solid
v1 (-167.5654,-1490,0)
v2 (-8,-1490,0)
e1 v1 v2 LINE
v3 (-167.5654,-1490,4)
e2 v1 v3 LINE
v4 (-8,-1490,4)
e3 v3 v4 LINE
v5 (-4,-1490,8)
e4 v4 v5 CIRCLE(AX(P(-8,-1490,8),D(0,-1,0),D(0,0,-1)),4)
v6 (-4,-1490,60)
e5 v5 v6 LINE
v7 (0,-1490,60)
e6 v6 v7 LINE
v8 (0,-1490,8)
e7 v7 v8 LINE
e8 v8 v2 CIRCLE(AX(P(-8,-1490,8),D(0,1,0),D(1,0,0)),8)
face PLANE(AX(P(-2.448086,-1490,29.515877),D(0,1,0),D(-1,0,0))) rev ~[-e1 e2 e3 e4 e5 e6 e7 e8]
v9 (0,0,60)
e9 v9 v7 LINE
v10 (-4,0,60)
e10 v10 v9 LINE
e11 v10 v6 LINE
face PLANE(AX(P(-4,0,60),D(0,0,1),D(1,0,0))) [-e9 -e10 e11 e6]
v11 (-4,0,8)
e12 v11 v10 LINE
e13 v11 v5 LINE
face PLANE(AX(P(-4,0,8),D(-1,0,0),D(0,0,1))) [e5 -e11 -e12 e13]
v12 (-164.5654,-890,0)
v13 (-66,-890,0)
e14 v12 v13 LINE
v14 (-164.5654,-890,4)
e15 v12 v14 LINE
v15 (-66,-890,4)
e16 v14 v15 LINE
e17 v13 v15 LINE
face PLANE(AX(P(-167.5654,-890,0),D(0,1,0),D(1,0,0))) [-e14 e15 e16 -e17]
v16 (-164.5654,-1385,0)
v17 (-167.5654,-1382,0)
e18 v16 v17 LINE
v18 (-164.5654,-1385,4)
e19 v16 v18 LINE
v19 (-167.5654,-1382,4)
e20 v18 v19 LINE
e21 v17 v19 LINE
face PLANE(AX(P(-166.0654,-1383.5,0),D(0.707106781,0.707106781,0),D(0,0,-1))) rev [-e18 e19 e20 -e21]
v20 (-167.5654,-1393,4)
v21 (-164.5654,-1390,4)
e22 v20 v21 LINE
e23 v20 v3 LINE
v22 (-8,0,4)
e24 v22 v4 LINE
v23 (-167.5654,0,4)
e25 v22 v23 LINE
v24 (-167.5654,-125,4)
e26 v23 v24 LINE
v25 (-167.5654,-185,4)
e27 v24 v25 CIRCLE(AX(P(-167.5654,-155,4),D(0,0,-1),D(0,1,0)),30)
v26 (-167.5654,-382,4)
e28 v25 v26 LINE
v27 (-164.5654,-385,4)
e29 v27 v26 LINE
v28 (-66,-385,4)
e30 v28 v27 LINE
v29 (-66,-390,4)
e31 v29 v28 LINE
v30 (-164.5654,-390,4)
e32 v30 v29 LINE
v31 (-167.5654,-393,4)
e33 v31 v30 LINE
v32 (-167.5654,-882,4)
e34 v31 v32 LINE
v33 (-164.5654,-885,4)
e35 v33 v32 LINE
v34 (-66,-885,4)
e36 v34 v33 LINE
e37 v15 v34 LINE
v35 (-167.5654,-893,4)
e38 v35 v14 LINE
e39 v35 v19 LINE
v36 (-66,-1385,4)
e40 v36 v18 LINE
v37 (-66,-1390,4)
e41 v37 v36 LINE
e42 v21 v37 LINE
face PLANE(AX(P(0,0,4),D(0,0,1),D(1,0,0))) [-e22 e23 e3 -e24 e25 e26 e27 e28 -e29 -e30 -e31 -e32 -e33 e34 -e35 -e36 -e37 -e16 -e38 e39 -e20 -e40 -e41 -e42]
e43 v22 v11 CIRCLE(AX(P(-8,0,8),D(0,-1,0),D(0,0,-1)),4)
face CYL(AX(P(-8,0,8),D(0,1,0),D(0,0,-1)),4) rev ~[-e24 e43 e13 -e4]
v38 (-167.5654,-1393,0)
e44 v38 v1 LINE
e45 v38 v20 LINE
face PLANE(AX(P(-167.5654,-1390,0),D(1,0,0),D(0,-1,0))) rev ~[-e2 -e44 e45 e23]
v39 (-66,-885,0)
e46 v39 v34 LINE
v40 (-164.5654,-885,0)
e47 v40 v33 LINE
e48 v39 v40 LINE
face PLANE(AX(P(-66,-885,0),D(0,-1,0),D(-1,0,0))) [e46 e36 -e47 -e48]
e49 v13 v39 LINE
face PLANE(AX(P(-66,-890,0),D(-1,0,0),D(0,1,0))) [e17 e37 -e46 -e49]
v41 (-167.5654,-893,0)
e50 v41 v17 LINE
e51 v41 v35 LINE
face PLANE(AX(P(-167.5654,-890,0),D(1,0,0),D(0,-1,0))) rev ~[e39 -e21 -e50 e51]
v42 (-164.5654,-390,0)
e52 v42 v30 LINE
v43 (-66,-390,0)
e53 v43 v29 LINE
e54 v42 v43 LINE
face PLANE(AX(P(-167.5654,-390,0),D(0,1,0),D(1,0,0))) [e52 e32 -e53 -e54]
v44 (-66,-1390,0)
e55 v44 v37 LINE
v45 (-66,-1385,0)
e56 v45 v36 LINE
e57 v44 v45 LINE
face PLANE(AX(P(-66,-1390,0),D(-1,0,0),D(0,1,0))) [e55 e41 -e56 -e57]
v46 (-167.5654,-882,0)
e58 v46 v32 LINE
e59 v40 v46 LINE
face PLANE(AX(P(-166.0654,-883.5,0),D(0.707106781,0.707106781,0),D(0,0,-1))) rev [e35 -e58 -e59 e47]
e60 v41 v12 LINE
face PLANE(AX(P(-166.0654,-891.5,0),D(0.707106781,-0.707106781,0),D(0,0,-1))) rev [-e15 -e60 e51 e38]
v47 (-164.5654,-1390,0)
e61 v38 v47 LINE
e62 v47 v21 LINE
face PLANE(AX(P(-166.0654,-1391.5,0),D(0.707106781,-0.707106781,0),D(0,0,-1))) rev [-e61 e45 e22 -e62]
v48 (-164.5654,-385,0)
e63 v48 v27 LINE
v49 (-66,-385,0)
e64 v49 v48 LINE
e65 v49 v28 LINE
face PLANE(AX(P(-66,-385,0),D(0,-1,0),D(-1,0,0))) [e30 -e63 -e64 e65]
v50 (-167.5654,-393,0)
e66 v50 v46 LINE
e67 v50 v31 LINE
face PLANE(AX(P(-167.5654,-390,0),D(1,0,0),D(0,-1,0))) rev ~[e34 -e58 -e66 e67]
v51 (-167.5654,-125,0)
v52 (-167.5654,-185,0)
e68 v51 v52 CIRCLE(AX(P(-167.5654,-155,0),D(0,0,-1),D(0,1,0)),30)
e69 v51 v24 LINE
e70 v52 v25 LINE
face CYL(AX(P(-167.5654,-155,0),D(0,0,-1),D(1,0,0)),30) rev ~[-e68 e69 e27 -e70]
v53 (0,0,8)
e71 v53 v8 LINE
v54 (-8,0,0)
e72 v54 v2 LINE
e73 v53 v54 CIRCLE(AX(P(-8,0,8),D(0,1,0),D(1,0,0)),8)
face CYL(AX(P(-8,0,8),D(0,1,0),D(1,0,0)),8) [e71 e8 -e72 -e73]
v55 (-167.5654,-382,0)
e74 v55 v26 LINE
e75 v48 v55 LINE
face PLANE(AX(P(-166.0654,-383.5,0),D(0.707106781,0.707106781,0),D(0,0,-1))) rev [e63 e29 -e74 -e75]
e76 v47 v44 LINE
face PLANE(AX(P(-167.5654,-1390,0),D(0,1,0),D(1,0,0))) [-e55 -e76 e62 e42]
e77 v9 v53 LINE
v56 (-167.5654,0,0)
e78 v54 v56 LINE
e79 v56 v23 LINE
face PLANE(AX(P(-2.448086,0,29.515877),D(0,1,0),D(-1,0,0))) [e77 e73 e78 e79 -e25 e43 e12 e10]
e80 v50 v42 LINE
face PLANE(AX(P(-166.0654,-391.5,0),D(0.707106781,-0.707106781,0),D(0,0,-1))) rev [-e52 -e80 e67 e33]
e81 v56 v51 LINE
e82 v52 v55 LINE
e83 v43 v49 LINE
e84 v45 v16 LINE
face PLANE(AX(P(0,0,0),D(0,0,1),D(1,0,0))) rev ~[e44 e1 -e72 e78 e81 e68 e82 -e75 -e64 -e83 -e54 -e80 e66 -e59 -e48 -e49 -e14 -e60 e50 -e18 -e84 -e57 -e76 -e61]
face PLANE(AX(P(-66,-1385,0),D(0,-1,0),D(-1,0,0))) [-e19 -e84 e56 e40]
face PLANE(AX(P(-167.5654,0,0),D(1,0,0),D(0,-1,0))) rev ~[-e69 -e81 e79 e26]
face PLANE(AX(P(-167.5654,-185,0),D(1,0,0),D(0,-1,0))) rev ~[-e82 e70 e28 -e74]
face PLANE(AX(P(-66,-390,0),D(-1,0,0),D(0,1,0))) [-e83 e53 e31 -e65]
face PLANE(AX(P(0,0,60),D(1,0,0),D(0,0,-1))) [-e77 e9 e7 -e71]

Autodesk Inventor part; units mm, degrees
ref_plane "YZ Plane" through (0, 0, 0) normal (1, 0, 0) x (0, 1, 0)
ref_plane "XZ Plane" through (0, 0, 0) normal (0, 1, 0) x (-1, 0, 0)
ref_plane "XY Plane" through (0, 0, 0) normal (0, 0, 1) x (1, 0, 0)
sketch "Sketch1" plane through (0, 0, 0) normal (0, 0, 1) x (1, 0, 0)
  line L0 (0, 0) -> (-167.5654, 0)
  line L1 (-167.5654, 0) -> (-167.5654, -1490)
  line L2 (-167.5654, -1490) -> (0, -1490)
  line L3 (0, -1490) -> (0, 0)
  line L4 (-167.5654, -1390) -> (-66, -1390)
  line L5 (-66, -1390) -> (-66, -1385)
  line L6 (-66, -1385) -> (-167.5654, -1385)
  line L7 (-167.5654, -1385) -> (-167.5654, -1390)
  line L8 (-167.5654, -890) -> (-66, -890)
  line L9 (-66, -890) -> (-66, -885)
  line L10 (-66, -885) -> (-167.5654, -885)
  line L11 (-167.5654, -885) -> (-167.5654, -890)
  line L12 (-167.5654, -390) -> (-66, -390)
  line L13 (-66, -390) -> (-66, -385)
  line L14 (-66, -385) -> (-167.5654, -385)
  line L15 (-167.5654, -385) -> (-167.5654, -390)
  circle A0 centre (-167.5654, -155) radius 30
  point P0 (-167.5654, -385)
  point P1 (-167.5654, -390)
  point P2 (-167.5654, -885)
  point P3 (-167.5654, -890)
  point P4 (-167.5654, -125)
  point P5 (-167.5654, -185)
  dimension "d0" = 1490
  dimension "d1" = 167.5654
  dimension "d2" = 5
  dimension "d4" = 100
  dimension "d7" = 500
  dimension "d23" = 66
  dimension "d28" = 60
  dimension "d29" = 1335
extrude "Plate1" add sketch "Sketch1" along normal blind 4 contours L3 L2 L1 L4 L5 L6 L8 L9 L10 L12 L13 L14 A0 L0
sketch "Sketch2" plane through (-4, 0, 0) normal (1, 0, 0) x (0, 1, 0)
  line L0 (-1490, 0) -> (0, 0)
  line L1 (0, 0) -> (0, 60)
  line L2 (0, 60) -> (-1490, 60)
  line L3 (-1490, 60) -> (-1490, 0)
edge flange "Flange1" height 60 angle 90 thickness 4 bend radius 4 thickness toward (1, 0, 0) relief tear relief width 4 relief depth 2 edges at (0, -745, 4) wall of the first edge with corners at (-4, -1490, 0) (-4, 0, 0) (-4, 0, 60) (-4, -1490, 60)
bend "Bend1"
corner "Corner1"
chamfer "Corner Chamfer1" distance 3 angle 45 6 edges at (-167.5654, -1390, 2) (-167.5654, -1385, 2) (-167.5654, -890, 2) (-167.5654, -885, 2) (-167.5654, -385, 2) (-167.5654, -390, 2)
equation "\"d0\" = Стрингер_длина"
equation "\"d1\" = стрингер_глубина_3"
equation "\"d2\" = паз_под_стрингер_толщина"
equation "\"d23\" = паз_под_стрингер_глубина - Thickness"
equation "\"d28\" = 2 * радиус_выреза_под_сварку"
equation "\"d12\" = Thickness"
equation "\"d13\" = BendReliefWidth"
equation "\"d14\" = BendReliefDepth"
equation "\"d15\" = MinimumRemnant"
equation "\"d16\" = TransitionRadius"
equation "\"d17\" = ребро_усилителей"
equation "\"d19\" = BendRadius"
equation "\"d20\" = CornerReliefSize"
equation "\"d21\" = GapSize"
equation "\"d22\" = JacobiRadiusSize"
equation "\"BendRadius\" = Thickness"
equation "\"BendReliefWidth\" = Thickness"
equation "\"BendReliefDepth\" = 0.5 * Thickness"
equation "\"CornerReliefSize\" = 4 * Thickness"
equation "\"MinimumRemnant\" = 2 * Thickness"
equation "\"TransitionRadius\" = BendRadius"
equation "\"JacobiRadiusSize\" = BendRadius"
equation "\"GapSize\" = Thickness"
equation "\"Стрингер_длина\" = 1490"
equation "\"стрингер_глубина_3\" = 167.565356"
equation "\"паз_под_стрингер_толщина\" = 5"
equation "\"паз_под_стрингер_глубина\" = 70"
equation "\"Thickness\" = 4"
equation "\"радиус_выреза_под_сварку\" = 30"
equation "\"ребро_усилителей\" = 60"
properties part number "GBK 1114 stringer 3" material "Steel"
